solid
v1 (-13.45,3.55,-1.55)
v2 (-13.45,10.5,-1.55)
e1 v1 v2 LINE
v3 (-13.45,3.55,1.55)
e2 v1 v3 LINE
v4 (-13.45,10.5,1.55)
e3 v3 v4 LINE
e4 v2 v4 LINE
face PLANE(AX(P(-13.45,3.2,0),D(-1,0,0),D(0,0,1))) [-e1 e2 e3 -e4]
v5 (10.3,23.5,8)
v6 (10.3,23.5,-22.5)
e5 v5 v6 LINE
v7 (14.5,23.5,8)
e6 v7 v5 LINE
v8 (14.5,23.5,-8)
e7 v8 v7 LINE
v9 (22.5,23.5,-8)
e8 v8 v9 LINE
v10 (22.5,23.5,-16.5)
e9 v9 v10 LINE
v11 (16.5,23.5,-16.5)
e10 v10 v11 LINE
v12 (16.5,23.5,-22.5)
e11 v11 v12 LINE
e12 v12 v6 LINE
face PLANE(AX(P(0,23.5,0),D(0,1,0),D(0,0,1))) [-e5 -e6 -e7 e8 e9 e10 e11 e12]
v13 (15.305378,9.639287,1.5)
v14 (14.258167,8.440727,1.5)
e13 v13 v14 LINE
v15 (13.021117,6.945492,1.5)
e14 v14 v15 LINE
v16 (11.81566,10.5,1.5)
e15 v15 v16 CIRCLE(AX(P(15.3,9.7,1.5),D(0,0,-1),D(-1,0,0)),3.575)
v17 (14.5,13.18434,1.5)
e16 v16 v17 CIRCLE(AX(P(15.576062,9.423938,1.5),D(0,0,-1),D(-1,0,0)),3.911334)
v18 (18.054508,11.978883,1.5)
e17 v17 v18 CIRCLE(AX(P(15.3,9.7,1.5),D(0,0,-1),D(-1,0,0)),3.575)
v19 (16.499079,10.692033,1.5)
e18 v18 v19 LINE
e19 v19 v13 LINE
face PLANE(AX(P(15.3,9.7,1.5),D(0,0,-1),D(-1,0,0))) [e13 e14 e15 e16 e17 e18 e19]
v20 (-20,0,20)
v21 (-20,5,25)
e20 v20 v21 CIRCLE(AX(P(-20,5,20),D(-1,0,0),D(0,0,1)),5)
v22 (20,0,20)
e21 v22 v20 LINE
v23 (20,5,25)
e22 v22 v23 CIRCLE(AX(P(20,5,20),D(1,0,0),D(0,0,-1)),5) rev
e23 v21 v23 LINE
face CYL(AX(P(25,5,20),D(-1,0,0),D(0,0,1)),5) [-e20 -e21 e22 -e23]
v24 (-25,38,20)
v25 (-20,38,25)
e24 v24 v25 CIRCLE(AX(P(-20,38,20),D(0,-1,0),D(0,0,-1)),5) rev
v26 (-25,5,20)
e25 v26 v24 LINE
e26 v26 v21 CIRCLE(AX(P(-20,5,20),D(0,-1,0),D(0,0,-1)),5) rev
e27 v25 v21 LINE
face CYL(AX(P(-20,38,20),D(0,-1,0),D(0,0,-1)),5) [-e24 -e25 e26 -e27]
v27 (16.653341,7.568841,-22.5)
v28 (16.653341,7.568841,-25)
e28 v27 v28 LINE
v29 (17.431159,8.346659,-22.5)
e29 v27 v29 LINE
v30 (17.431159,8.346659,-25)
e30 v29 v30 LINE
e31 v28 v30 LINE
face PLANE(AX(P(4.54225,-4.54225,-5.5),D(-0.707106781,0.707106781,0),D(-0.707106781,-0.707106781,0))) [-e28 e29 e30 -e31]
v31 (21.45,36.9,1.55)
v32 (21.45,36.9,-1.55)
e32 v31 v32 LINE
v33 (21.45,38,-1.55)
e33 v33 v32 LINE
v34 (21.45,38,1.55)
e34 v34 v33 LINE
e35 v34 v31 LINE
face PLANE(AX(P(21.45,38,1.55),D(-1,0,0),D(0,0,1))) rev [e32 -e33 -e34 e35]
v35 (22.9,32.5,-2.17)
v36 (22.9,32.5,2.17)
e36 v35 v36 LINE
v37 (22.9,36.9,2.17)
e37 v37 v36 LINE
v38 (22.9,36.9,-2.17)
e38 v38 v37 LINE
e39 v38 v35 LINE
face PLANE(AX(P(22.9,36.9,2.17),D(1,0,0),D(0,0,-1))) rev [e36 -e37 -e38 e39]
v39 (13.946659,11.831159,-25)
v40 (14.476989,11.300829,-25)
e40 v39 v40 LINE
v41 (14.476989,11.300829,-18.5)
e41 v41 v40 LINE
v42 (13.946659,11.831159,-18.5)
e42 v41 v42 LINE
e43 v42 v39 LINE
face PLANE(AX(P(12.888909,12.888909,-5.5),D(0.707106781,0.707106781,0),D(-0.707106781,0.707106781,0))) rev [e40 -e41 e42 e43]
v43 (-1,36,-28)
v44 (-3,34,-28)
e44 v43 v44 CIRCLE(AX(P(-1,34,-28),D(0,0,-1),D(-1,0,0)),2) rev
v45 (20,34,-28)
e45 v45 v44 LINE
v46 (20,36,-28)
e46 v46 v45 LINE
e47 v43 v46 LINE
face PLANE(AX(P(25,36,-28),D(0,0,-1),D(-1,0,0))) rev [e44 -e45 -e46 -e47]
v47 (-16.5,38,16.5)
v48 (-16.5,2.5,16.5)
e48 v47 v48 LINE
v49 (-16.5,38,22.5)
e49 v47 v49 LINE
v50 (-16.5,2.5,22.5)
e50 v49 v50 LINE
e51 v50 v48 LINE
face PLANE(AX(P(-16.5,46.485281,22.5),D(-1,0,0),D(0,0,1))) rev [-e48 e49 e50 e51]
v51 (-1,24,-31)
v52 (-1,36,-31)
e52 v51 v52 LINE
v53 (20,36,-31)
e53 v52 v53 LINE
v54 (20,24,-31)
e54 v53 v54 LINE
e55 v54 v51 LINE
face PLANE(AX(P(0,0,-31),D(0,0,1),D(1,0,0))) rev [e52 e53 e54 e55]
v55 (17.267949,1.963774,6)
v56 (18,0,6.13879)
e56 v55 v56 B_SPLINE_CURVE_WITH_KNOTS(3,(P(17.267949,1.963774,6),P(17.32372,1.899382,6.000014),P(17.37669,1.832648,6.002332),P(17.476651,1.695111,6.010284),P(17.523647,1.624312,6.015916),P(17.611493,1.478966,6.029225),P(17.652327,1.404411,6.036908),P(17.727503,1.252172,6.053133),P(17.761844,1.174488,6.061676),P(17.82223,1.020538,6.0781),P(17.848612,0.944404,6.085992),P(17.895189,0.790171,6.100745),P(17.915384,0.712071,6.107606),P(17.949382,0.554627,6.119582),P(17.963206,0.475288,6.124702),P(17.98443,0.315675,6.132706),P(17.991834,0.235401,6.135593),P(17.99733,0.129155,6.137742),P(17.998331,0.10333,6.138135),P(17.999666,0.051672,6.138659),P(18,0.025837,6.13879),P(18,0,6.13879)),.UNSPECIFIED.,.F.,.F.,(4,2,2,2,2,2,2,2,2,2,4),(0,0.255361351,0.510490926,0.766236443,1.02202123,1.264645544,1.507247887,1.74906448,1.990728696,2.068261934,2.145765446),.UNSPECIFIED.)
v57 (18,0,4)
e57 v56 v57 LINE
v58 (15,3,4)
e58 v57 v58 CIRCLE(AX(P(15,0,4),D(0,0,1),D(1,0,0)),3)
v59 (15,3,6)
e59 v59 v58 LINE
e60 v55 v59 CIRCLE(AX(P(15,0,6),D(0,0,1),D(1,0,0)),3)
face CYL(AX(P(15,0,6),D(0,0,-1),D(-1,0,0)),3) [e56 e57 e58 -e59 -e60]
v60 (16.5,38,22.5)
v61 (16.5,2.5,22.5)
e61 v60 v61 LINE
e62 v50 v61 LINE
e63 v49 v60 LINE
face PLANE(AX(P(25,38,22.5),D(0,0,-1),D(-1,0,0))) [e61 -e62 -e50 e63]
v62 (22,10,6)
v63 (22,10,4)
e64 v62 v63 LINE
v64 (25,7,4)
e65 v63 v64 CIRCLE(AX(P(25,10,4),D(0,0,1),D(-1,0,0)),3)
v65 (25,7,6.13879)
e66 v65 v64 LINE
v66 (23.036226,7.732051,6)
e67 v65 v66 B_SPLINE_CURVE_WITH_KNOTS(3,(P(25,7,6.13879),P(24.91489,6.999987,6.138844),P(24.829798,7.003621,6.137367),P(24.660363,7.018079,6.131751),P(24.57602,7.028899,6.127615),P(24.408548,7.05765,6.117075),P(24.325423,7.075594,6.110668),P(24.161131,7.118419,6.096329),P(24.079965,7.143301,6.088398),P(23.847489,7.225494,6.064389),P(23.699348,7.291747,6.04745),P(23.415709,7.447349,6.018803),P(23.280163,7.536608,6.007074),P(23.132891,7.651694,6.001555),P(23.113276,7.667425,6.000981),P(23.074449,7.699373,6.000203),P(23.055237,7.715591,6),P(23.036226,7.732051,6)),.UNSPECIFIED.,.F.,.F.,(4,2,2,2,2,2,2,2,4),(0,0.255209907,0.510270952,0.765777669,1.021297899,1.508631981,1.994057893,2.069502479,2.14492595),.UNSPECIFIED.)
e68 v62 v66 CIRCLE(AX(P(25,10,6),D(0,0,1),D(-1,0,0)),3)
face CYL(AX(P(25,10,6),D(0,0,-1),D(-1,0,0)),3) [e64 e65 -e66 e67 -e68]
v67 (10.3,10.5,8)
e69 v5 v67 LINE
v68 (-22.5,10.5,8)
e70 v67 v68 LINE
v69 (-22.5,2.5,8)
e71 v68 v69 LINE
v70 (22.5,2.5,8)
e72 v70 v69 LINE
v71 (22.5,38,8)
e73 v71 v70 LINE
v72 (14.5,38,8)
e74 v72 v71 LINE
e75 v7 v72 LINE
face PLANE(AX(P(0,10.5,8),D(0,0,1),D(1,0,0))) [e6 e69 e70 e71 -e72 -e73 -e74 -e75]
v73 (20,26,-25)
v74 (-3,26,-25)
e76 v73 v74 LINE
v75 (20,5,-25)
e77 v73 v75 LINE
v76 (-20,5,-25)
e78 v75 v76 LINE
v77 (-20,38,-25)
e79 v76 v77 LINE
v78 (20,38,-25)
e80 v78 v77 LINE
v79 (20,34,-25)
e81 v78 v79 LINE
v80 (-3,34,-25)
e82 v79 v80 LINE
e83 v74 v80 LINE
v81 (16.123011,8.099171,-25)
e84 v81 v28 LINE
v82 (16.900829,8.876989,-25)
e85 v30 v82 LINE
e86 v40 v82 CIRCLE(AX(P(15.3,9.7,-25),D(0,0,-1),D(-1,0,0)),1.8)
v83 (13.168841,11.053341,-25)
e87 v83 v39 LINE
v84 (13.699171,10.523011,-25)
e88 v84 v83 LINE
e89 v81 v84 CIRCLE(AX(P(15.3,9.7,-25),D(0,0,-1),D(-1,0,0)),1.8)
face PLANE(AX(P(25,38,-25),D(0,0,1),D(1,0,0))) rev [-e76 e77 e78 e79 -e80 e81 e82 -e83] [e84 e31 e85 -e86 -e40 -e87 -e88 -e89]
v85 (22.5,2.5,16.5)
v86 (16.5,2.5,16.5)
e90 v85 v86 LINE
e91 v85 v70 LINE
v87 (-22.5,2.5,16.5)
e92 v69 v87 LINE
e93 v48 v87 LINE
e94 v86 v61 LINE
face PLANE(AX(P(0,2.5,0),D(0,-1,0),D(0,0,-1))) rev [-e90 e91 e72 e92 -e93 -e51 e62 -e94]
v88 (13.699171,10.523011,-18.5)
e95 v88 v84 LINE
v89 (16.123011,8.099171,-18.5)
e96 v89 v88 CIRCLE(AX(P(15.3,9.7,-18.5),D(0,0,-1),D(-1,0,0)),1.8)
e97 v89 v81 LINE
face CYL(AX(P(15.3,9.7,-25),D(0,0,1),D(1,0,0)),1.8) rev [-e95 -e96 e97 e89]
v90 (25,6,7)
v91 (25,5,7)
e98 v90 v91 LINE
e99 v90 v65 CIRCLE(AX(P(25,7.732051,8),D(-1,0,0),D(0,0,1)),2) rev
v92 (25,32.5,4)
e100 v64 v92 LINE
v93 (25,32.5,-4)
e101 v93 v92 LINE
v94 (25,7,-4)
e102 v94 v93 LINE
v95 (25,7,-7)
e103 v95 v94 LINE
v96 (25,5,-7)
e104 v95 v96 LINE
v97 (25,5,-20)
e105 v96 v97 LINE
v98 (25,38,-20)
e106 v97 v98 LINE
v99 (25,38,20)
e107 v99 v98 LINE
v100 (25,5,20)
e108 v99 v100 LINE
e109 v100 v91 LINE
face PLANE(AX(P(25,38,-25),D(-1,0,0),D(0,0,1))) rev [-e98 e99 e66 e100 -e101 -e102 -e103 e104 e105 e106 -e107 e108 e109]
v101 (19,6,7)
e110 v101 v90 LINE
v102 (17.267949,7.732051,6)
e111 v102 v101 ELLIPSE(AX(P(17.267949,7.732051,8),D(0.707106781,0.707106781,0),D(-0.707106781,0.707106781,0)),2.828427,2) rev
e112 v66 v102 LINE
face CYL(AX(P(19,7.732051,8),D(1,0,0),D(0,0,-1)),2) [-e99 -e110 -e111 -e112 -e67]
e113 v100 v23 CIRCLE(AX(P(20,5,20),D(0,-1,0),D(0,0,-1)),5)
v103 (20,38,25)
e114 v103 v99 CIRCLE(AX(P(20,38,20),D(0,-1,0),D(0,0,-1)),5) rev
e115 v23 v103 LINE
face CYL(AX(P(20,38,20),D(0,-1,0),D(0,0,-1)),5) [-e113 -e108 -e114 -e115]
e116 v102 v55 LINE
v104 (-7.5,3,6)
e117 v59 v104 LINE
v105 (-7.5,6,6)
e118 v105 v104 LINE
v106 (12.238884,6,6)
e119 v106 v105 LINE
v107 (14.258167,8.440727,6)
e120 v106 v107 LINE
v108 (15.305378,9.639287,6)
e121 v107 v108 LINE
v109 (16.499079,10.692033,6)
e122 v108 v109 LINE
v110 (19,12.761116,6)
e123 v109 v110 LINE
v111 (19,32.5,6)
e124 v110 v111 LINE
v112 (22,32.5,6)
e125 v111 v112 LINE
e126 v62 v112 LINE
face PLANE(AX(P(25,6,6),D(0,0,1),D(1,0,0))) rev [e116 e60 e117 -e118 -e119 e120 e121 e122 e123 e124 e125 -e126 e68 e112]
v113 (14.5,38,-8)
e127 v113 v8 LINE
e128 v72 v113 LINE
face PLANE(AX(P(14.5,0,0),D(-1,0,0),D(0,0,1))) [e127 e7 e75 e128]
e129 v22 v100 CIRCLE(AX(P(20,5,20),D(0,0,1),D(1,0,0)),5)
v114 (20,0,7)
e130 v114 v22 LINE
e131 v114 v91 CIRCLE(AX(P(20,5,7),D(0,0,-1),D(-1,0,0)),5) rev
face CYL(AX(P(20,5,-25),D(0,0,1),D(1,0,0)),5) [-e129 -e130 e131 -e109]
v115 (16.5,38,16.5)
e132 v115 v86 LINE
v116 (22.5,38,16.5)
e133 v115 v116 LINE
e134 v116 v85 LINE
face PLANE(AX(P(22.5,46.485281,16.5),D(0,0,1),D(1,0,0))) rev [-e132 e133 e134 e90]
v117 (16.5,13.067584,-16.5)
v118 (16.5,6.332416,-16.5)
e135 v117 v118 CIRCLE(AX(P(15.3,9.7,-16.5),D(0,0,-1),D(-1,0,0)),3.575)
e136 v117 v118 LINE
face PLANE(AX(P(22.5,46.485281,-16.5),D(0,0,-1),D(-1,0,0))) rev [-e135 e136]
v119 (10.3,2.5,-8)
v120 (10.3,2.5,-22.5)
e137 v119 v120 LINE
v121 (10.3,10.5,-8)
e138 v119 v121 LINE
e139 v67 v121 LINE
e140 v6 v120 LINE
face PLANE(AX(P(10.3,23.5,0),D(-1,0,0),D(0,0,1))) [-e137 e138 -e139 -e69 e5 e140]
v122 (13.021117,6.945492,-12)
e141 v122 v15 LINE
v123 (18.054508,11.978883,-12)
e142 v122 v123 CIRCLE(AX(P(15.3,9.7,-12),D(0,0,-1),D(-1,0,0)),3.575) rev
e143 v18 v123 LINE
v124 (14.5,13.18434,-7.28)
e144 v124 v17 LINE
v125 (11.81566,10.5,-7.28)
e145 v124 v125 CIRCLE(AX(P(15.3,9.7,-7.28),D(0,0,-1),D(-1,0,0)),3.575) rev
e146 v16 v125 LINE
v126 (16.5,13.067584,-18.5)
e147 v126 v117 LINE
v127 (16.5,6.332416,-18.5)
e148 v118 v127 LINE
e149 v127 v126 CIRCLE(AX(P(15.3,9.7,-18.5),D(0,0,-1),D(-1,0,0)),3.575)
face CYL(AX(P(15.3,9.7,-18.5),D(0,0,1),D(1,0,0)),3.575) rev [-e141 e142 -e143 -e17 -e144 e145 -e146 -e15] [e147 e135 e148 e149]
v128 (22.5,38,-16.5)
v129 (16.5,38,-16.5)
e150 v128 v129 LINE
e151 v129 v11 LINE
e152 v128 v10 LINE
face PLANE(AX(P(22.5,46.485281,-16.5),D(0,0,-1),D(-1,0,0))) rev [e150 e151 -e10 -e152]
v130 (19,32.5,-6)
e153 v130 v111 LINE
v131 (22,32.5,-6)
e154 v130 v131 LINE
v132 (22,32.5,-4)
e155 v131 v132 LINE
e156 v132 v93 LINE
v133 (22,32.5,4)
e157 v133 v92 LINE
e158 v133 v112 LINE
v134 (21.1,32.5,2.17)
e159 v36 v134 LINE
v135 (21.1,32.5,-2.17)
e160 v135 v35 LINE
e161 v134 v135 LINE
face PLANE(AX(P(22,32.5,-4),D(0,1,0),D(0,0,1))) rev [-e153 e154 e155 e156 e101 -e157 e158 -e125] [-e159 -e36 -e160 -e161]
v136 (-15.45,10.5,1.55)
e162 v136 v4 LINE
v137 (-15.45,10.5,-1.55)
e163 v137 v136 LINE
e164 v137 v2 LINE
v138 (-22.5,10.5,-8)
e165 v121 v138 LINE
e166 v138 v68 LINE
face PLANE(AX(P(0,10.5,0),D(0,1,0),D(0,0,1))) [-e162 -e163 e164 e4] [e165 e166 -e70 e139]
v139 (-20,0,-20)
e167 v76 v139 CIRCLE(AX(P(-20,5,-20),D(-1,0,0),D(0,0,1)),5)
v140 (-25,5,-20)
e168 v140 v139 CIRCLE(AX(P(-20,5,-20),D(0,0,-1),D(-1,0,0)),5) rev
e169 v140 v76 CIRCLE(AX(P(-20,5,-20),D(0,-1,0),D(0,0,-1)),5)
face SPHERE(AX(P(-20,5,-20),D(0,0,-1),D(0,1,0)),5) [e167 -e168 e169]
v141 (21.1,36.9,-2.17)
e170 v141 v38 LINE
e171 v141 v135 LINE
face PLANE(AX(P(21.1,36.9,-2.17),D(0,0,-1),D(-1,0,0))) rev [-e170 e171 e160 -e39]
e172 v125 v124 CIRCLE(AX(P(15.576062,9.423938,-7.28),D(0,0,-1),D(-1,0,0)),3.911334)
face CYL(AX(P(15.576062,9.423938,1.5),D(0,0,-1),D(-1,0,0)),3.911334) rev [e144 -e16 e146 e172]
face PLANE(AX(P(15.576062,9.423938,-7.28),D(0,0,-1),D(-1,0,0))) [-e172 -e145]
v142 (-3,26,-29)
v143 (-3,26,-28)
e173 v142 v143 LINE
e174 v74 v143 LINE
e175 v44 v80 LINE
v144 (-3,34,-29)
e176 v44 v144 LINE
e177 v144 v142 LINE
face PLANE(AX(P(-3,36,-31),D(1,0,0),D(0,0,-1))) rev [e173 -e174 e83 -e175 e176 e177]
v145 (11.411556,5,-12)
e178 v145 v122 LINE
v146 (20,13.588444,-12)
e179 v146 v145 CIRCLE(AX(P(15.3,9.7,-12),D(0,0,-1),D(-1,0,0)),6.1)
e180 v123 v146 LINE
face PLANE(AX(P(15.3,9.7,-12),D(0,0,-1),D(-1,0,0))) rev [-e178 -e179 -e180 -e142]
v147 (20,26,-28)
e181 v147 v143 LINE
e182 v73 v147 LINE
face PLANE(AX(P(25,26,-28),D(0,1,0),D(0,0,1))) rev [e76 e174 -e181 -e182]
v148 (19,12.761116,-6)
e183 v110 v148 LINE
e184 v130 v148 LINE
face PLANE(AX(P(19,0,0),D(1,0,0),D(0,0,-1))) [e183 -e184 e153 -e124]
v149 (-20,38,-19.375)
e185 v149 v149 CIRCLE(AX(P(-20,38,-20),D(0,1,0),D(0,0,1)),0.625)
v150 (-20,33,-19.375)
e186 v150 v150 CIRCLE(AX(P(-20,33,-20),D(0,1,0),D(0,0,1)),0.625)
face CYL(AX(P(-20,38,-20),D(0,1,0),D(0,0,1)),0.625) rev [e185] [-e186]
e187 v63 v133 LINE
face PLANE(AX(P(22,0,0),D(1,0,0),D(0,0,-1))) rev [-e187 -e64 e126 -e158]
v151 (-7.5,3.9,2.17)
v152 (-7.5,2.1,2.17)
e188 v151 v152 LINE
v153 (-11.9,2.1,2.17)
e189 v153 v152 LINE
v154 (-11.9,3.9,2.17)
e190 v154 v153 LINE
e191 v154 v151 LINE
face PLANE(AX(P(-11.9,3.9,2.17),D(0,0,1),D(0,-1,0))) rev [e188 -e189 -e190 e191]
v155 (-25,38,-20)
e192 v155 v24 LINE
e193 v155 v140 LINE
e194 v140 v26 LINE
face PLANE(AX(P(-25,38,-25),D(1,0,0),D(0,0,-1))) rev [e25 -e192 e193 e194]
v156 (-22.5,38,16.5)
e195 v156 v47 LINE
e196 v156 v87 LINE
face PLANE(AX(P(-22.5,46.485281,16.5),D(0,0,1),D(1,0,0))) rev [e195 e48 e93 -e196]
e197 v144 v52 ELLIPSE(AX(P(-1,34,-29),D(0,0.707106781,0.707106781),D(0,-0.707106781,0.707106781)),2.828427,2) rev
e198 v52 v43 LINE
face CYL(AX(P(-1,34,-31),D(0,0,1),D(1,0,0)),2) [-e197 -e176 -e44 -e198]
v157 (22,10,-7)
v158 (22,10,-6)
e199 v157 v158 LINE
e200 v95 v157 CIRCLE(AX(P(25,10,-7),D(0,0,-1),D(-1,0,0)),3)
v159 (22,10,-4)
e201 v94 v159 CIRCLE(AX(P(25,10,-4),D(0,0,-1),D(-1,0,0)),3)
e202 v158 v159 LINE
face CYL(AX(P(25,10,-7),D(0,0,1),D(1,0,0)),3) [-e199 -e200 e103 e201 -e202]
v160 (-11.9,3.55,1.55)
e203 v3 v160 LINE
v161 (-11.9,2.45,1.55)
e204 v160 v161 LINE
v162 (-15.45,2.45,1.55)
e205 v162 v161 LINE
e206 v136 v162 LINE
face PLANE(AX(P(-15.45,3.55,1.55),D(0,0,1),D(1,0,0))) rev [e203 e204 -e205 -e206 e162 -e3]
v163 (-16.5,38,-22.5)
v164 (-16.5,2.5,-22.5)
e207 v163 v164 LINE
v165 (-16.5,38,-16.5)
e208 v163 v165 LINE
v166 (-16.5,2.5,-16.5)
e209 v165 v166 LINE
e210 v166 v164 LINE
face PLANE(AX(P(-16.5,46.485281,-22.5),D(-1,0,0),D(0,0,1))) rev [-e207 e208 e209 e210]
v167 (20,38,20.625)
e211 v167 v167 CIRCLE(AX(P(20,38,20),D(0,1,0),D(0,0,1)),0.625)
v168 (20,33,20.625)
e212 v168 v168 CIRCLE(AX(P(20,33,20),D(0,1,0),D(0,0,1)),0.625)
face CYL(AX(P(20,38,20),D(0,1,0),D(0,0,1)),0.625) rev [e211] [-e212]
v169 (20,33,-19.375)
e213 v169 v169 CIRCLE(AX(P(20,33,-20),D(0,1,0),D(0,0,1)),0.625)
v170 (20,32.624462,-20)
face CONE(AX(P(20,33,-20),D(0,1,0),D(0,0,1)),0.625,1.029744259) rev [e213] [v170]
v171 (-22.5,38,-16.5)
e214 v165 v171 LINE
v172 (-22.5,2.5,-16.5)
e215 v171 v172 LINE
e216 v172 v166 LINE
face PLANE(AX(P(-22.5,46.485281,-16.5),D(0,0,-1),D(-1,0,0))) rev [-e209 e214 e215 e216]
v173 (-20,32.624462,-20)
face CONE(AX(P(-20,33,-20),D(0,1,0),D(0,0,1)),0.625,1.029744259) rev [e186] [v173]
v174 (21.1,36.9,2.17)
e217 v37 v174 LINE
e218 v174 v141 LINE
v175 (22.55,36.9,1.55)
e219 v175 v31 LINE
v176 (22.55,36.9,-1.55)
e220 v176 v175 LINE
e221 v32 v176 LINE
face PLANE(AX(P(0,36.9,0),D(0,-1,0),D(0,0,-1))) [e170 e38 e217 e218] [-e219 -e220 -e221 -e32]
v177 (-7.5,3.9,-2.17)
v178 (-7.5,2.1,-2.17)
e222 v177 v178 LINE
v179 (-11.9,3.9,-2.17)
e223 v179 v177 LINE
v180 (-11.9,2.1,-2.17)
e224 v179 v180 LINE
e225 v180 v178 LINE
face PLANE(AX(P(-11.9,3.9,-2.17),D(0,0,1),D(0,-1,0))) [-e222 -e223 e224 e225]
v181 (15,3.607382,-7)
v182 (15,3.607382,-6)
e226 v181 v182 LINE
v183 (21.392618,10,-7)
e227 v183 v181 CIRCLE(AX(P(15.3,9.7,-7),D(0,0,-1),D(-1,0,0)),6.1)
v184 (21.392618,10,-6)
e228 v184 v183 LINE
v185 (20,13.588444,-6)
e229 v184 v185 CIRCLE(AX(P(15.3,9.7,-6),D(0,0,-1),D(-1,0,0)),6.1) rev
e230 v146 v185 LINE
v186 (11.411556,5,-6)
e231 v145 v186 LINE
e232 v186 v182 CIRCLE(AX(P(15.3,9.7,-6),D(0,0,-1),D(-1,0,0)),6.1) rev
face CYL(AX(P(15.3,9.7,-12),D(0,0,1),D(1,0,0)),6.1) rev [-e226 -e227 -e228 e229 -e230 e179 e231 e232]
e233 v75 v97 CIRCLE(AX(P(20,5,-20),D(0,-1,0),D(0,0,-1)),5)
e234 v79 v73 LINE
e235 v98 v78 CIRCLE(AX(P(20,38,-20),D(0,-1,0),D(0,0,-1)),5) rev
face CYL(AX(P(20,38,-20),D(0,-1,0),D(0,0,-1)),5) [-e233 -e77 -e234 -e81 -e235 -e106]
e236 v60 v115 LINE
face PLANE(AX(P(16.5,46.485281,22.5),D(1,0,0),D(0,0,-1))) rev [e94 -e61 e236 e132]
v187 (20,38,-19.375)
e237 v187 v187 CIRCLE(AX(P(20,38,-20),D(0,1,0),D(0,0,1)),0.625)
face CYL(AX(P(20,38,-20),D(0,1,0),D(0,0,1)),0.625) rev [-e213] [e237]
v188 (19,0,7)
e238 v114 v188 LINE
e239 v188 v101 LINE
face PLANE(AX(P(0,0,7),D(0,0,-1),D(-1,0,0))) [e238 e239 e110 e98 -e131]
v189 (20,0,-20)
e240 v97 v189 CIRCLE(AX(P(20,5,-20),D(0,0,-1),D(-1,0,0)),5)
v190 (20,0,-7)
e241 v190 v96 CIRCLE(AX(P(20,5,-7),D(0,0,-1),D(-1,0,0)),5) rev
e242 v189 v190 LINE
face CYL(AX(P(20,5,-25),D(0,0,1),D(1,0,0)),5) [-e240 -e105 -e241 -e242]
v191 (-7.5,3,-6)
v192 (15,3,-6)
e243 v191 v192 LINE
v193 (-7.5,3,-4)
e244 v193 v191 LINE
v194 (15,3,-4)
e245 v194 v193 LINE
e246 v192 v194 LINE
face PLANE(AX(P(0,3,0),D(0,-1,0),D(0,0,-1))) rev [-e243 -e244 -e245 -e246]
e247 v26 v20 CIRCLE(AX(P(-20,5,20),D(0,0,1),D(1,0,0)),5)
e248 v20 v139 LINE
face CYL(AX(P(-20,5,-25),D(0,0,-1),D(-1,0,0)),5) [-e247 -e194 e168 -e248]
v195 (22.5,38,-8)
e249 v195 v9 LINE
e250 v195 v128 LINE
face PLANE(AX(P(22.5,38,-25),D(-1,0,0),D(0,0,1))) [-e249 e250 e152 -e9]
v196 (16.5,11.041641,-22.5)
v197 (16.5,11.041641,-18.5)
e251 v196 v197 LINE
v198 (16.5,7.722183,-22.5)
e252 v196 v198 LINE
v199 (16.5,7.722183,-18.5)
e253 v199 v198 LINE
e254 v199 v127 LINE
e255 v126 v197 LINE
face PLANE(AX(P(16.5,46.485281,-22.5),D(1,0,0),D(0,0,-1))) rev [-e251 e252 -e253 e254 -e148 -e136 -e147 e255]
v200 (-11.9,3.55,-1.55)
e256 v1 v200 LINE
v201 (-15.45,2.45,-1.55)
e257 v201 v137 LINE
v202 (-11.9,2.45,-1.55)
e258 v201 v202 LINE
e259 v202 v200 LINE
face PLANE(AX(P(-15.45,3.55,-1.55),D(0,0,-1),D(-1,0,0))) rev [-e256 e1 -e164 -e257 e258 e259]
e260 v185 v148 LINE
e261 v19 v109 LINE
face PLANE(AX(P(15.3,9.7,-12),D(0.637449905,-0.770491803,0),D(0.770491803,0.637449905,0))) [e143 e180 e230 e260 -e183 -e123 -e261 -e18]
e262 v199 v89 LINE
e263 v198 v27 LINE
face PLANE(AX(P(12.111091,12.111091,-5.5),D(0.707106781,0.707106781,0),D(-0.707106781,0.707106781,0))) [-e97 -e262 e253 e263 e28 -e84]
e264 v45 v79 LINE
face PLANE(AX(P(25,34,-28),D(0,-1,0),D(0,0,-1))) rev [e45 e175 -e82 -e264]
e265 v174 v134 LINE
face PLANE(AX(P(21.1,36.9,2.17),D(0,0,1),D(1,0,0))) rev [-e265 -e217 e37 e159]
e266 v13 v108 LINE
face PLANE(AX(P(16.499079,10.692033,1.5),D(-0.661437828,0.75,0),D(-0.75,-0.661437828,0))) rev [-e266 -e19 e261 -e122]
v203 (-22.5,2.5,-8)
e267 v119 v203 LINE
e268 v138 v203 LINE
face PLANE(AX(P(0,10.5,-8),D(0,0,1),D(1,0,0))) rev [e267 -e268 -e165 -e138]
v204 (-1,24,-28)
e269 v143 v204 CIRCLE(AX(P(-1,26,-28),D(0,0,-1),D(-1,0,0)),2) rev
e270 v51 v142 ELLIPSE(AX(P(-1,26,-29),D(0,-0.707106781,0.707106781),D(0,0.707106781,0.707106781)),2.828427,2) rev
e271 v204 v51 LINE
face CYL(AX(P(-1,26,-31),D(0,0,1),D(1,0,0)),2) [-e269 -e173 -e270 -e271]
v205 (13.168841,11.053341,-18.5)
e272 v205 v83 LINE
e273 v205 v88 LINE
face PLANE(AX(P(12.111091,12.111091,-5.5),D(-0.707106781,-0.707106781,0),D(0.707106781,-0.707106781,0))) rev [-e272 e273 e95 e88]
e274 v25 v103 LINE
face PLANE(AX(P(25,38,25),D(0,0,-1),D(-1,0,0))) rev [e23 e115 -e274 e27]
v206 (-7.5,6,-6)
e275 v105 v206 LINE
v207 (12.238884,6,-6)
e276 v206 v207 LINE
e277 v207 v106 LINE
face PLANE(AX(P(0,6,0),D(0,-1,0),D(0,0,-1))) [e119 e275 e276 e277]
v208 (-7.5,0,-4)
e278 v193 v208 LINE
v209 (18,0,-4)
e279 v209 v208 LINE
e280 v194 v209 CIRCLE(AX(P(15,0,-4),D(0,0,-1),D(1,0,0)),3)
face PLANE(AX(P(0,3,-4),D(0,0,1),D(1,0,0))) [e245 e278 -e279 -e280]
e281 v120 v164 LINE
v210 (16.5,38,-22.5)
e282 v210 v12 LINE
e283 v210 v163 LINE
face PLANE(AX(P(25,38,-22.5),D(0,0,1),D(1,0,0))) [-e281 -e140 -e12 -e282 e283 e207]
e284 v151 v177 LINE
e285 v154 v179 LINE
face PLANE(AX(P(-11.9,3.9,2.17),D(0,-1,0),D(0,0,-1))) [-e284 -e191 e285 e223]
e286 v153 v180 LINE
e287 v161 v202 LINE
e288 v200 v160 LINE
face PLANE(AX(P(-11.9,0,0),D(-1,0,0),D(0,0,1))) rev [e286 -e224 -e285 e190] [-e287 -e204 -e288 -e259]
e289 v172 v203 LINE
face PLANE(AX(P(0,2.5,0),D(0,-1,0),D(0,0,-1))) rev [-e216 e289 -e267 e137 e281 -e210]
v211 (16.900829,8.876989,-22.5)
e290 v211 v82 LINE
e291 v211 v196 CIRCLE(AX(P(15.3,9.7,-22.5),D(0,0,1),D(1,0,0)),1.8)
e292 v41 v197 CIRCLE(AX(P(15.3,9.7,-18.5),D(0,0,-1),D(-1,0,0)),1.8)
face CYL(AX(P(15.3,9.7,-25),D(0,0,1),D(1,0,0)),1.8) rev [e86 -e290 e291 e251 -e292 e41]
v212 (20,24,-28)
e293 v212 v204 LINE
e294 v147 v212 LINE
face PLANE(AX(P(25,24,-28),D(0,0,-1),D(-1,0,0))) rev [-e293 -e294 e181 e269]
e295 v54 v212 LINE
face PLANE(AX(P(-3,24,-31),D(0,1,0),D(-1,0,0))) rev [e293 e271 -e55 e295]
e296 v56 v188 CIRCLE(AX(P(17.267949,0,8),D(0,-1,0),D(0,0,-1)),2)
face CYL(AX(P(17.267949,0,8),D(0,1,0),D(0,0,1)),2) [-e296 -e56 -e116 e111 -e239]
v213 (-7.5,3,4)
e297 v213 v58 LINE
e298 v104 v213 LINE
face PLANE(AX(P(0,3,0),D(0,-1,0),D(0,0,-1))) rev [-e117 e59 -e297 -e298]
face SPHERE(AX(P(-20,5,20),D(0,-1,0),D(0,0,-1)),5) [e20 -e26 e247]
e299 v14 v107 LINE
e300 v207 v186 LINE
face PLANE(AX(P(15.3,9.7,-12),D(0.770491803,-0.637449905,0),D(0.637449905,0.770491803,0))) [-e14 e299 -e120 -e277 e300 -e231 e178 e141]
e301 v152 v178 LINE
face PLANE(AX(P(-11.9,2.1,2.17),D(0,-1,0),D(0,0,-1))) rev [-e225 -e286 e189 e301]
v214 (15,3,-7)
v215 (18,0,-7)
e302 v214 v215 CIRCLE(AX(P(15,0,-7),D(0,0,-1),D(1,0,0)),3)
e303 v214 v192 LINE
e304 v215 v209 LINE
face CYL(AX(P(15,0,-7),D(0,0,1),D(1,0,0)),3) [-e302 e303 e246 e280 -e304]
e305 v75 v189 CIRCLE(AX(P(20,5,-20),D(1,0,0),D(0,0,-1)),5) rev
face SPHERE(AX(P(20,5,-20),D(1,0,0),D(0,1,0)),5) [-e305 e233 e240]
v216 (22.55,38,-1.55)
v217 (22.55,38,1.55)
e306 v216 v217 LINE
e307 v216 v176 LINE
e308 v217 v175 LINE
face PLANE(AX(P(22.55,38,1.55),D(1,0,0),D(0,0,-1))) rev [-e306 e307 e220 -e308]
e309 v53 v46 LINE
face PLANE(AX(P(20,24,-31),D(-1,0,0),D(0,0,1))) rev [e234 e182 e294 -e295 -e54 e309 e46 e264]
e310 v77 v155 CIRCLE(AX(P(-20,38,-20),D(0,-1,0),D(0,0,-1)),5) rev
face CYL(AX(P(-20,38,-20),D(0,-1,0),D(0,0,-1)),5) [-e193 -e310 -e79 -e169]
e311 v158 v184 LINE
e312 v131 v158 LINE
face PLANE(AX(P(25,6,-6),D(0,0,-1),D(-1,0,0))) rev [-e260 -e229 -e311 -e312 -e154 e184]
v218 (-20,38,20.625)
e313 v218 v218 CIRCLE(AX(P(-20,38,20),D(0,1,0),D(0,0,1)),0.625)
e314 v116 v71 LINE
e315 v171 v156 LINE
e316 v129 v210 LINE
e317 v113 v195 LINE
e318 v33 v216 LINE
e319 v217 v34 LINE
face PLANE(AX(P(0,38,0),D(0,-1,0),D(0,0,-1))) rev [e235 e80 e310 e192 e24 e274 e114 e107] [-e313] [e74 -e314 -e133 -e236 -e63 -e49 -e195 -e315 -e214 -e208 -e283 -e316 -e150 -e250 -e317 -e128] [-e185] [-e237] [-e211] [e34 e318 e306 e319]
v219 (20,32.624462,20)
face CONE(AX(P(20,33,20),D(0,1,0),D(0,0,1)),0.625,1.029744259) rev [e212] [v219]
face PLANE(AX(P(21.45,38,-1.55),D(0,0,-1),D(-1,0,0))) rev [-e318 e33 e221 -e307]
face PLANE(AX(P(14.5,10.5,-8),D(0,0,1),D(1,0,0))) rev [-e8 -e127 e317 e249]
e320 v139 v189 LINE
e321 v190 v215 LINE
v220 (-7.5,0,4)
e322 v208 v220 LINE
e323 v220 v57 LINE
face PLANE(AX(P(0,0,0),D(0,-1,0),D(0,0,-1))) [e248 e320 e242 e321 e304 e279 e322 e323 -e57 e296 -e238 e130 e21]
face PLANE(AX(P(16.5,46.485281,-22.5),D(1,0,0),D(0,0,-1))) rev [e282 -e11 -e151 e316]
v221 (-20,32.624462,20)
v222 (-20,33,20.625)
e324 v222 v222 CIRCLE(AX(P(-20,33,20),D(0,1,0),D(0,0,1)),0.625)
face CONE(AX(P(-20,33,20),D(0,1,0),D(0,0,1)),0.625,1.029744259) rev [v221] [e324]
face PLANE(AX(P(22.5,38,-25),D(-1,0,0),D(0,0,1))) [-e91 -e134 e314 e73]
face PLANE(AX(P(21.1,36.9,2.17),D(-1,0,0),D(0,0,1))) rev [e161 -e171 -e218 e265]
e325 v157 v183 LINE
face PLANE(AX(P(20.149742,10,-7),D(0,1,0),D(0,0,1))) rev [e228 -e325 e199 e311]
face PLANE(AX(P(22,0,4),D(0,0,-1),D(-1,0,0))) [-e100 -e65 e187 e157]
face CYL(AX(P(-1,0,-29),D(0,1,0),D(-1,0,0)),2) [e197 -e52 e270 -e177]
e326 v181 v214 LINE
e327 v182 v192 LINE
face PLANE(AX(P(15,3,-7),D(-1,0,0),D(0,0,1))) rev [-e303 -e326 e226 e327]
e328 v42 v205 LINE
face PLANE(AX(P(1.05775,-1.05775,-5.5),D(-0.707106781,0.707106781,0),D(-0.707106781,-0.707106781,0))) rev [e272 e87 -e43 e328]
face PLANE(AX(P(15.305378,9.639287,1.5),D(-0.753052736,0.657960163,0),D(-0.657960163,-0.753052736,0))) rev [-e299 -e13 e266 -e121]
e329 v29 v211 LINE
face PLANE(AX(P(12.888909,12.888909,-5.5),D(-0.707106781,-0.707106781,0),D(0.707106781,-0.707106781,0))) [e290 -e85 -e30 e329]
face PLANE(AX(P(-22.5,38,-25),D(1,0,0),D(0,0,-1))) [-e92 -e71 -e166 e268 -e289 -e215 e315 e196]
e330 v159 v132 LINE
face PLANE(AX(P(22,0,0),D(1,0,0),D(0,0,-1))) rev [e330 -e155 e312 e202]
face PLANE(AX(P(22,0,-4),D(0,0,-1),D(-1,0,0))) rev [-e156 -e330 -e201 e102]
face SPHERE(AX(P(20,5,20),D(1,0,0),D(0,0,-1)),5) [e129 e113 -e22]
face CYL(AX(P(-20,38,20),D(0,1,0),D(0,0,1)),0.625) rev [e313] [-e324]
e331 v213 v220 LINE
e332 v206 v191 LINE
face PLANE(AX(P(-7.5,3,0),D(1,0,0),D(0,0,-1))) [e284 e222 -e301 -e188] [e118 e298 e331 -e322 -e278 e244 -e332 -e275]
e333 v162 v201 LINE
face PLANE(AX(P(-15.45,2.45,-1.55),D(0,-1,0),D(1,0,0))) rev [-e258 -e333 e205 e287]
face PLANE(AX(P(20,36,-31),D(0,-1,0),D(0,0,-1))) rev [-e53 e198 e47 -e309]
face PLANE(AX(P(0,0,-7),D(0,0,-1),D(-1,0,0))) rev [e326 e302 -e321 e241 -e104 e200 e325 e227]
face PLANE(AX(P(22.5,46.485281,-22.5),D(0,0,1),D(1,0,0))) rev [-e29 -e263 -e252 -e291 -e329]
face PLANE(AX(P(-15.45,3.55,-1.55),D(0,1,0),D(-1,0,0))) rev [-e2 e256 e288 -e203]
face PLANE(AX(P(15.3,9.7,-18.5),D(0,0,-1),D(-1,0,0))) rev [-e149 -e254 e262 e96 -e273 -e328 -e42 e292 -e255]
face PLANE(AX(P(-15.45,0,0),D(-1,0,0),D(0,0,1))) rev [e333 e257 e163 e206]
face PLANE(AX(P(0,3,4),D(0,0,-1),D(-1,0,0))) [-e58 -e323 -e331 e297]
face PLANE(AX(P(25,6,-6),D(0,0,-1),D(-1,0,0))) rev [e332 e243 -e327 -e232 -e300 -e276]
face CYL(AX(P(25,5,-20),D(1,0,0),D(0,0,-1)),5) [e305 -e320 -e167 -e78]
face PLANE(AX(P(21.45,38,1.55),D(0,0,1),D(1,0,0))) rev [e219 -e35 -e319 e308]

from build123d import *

# Parameters (mm, degrees)
SKETCH1_W                = 50
SKETCH1_H                = 50
BOSS_EXTRUDE1_DEPTH      = 38
SHELL1_T                 = -2.5
BOSS_EXTRUDE2_DEPTH      = 21
SKETCH3_W                = 45
SKETCH3_H                = 16
BOSS_EXTRUDE3_DEPTH      = 8
SKETCH4_W                = 32.5
SKETCH4_H                = 8
CUT_EXTRUDE1_DEPTH       = 3
SKETCH7_W                = 32.5
SKETCH7_H                = 12
CUT_EXTRUDE2_DEPTH       = 3
SKETCH8_W                = 16
SKETCH8_H                = 27.5
BOSS_EXTRUDE4_DEPTH      = 8
SKETCH9_W                = 8
SKETCH9_H                = 32.5
CUT_EXTRUDE3_DEPTH       = 3
CUT_EXTRUDE5_DEPTH       = 3
CUT_EXTRUDE7_DEPTH       = 10
CUT_EXTRUDE7_DEPTH_BACK  = 2
SKETCH13_W               = 3
SKETCH13_H               = 3.011524732
FILLET1_R                = 5
SKETCH16_R               = 1.8
CUT_EXTRUDE8_DEPTH       = 53.642663306
SKETCH17_W               = 23
SKETCH17_H               = 12
BOSS_EXTRUDE5_DEPTH      = 6
SKETCH18_W               = 3
SKETCH18_H               = 2
CUT_EXTRUDE9_DEPTH       = 57.471231614
CUT_EXTRUDE12_DEPTH      = 2
CUT_EXTRUDE13_DEPTH      = 2
CUT_EXTRUDE14_DEPTH      = 16
CUT_EXTRUDE10_START      = -19.5
CUT_EXTRUDE10_DEPTH      = 19.5
FILLET4_R                = 2
CUT_EXTRUDE18_DEPTH      = 13
CUT_EXTRUDE18_DEPTH_BACK = 1
SKETCH26_W               = 6
SKETCH26_H               = 6
BOSS_EXTRUDE6_DEPTH      = 4.5
SKETCH30_W               = 4.34
SKETCH30_H               = 1.8
CUT_EXTRUDE19_DEPTH      = 4.4
SKETCH31_W               = 1.8
SKETCH31_H               = 4.34
CUT_EXTRUDE20_DEPTH      = 4.4
SKETCH32_W               = 1.1
SKETCH32_H               = 3.1
CUT_EXTRUDE21_DEPTH      = 55.291896265
SKETCH33_W               = 3.1
SKETCH33_H               = 1.1
CUT_EXTRUDE22_DEPTH      = 3.55
SKETCH34_W               = 2
SKETCH34_H               = 3.1
CUT_EXTRUDE23_DEPTH      = 7.3
SKETCH45_R               = 3.575
CUT_EXTRUDE27_DEPTH      = 20
SKETCH46_W               = 1.850257739
SKETCH46_H               = 4
SKETCH46_W_2             = 4
SKETCH46_H_2             = 1.850257739
CUT_EXTRUDE28_DEPTH      = 1
CUT_EXTRUDE25_START      = -3
CUT_EXTRUDE25_DEPTH      = 3
CUT_EXTRUDE24_START      = -3
CUT_EXTRUDE24_DEPTH      = 3
CUT_EXTRUDE29_DEPTH      = 2
FILLET8_R                = 2
BOSS_EXTRUDE9_DEPTH      = 8.78
SKETCH49_W               = 4.2
SKETCH49_H               = 13
BOSS_EXTRUDE10_DEPTH     = 6.5
SKETCH50_W               = 6
SKETCH50_H               = 6
BOSS_EXTRUDE11_DEPTH     = 35.5
M1_6_TAPPED_HOLE1_D      = 1.25
M1_6_TAPPED_HOLE1_DEPTH  = 5
M1_6_TAPPED_HOLE1_TIP    = 0.375537887


with BuildPart() as part:
    # Sketch1 → Boss-Extrude1 (new body)
    with BuildSketch(Plane(origin=(0, 0, 0), x_dir=(1, 0, 0), z_dir=(0, 1, 0))):
        Rectangle(SKETCH1_W, SKETCH1_H)
    extrude(amount=BOSS_EXTRUDE1_DEPTH)

    # Shell1
    shell1_openings = [part.faces().sort_by_distance(p)[0] for p in [
        (0, 38, 0),
    ]]
    offset(amount=SHELL1_T, openings=shell1_openings, kind=Kind.INTERSECTION)

    # Sketch2 → Boss-Extrude2 (add)
    with BuildSketch(Plane(origin=(0, 2.5, 0), x_dir=(1, 0, 0), z_dir=(0, 1, 0))):
        Polygon((10.3, 22.5), (10.3, 13.5), (10.3, 7.28), (22.5, 7.28), (22.5, 22.5), align=None)
    extrude(amount=BOSS_EXTRUDE2_DEPTH)

    # Sketch3 → Boss-Extrude3 (add)
    with BuildSketch(Plane(origin=(0, 2.5, 0), x_dir=(1, 0, 0), z_dir=(0, 1, 0))):
        Rectangle(SKETCH3_W, SKETCH3_H)
    extrude(amount=BOSS_EXTRUDE3_DEPTH)

    # Sketch4 → Cut-Extrude1 (cut)
    with BuildSketch(Plane.XZ):
        with Locations((8.75, 0)):
            Rectangle(SKETCH4_W, SKETCH4_H)
    extrude(amount=-CUT_EXTRUDE1_DEPTH, mode=Mode.SUBTRACT)

    # Sketch7 → Cut-Extrude2 (cut)
    with BuildSketch(Plane(origin=(0, 3, 0), x_dir=(-1, 0, 0), z_dir=(0, -1, 0))):
        with Locations((-8.75, 0)):
            Rectangle(SKETCH7_W, SKETCH7_H)
    extrude(amount=-CUT_EXTRUDE2_DEPTH, mode=Mode.SUBTRACT)

    # Sketch8 → Boss-Extrude4 (add)
    with BuildSketch(Plane.ZY.offset(-22.5)):
        with Locations((0, 24.25)):
            Rectangle(SKETCH8_W, SKETCH8_H)
    extrude(amount=BOSS_EXTRUDE4_DEPTH)

    # Sketch9 → Cut-Extrude3 (cut)
    with BuildSketch(Plane(origin=(25, 0, 0), x_dir=(0, 0, -1), z_dir=(1, 0, 0))):
        with Locations((0, 16.25)):
            Rectangle(SKETCH9_W, SKETCH9_H)
    extrude(amount=-CUT_EXTRUDE3_DEPTH, mode=Mode.SUBTRACT)

    # Sketch10 → Cut-Extrude5 (cut)
    with BuildSketch(Plane(origin=(22, 0, 0), x_dir=(0, 0, -1), z_dir=(1, 0, 0))):
        Polygon((-6, 32.5), (-6, 0), (6, 0), (6, 3), (6, 32.5), align=None)
    extrude(amount=-CUT_EXTRUDE5_DEPTH, mode=Mode.SUBTRACT)

    # Sketch13 → Cut-Extrude7 (cut, two sides: drawn at the far end of the back side and taken through both)
    with BuildSketch(Plane(origin=(0, 0, 4), x_dir=(-1, 0, 0), z_dir=(0, 0, -1)).offset(-CUT_EXTRUDE7_DEPTH_BACK)):
        with Locations((-23.5, 1.505762366)):
            Rectangle(SKETCH13_W, SKETCH13_H)
    extrude(amount=CUT_EXTRUDE7_DEPTH + CUT_EXTRUDE7_DEPTH_BACK, mode=Mode.SUBTRACT)

    # Fillet1
    fillet1_edges = [part.edges().sort_by_distance(p)[0] for p in [
        (25, 0, -15.5),
        (0, 0, -25),
        (25, 0, 15.5),
        (0, 0, 25),
        (-25, 0, 0),
        (-25, 19, -25),
        (25, 19, -25),
        (25, 19, 25),
        (-25, 19, 25),
    ]]
    fillet(fillet1_edges, radius=FILLET1_R)

    # Sketch16 → Cut-Extrude8 (cut, through all)
    with BuildSketch(Plane(origin=(0, 0, 1.5), x_dir=(-1, 0, 0), z_dir=(0, 0, -1))):
        with Locations(Location((-15.3, 9.7, 0), (0, 0, 63.612200039))):
            Circle(SKETCH16_R)
    extrude(amount=CUT_EXTRUDE8_DEPTH, mode=Mode.SUBTRACT)

    # Sketch17 → Boss-Extrude5 (add)
    with BuildSketch(Plane(origin=(0, 0, -25), x_dir=(-1, 0, 0), z_dir=(0, 0, -1))):
        with Locations((-8.5, 30)):
            Rectangle(SKETCH17_W, SKETCH17_H)
    extrude(amount=BOSS_EXTRUDE5_DEPTH)

    # Sketch18 → Cut-Extrude9 (cut, through all)
    with BuildSketch(Plane.ZY.offset(3)):
        with Locations((-26.5, 25)):
            Rectangle(SKETCH18_W, SKETCH18_H)
        with Locations((-26.5, 35)):
            Rectangle(SKETCH18_W, SKETCH18_H)
    extrude(amount=-CUT_EXTRUDE9_DEPTH, mode=Mode.SUBTRACT)

    # Sketch20 → Cut-Extrude12 (cut)
    with BuildSketch(Plane(origin=(0, 0, 4), x_dir=(-1, 0, 0), z_dir=(0, 0, -1))):
        with BuildLine():
            Line((-22, 10), (-22, 7))
            Line((-22, 7), (-22, 6))
            Line((-22, 6), (-24, 6))
            Line((-24, 6), (-25, 6))
            Line((-25, 6), (-25, 7))
            ThreePointArc((-25, 7), (-22.878679656, 7.878679656), (-22, 10))
        make_face()
    extrude(amount=-CUT_EXTRUDE12_DEPTH, mode=Mode.SUBTRACT)

    # Sketch21 → Cut-Extrude13 (cut)
    with BuildSketch(Plane(origin=(0, 0, 4), x_dir=(-1, 0, 0), z_dir=(0, 0, -1))):
        with BuildLine():
            Line((-19, 3), (-19, 0))
            Line((-19, 0), (-18, 0))
            ThreePointArc((-18, 0), (-17.121320344, 2.121320344), (-15, 3))
            Line((-15, 3), (-19, 3))
        make_face()
    extrude(amount=-CUT_EXTRUDE13_DEPTH, mode=Mode.SUBTRACT)

    # Sketch22 → Cut-Extrude14 (cut)
    with BuildSketch(Plane(origin=(0, 0, 4), x_dir=(-1, 0, 0), z_dir=(0, 0, -1))):
        with BuildLine():
            Line((-15.3, 9.7), (-11.411555581, 5))
            ThreePointArc((-11.411555581, 5), (-19.613351365, 5.386648635), (-20, 13.588444419))
            Line((-20, 13.588444419), (-15.3, 9.7))
        make_face()
    extrude(amount=CUT_EXTRUDE14_DEPTH, mode=Mode.SUBTRACT)

    # Sketch19 → Cut-Extrude10 (cut)
    with BuildSketch(Plane(origin=(0, 0, -25), x_dir=(-1, 0, 0), z_dir=(0, 0, -1)).offset(CUT_EXTRUDE10_START)):
        with BuildLine():
            ThreePointArc((-16.123011235, 8.099171306), (-16.572792206, 8.427207794), (-16.900828694, 8.876988765))
            Line((-16.900828694, 8.876988765), (-17.43115878, 8.346658679))
            Line((-17.43115878, 8.346658679), (-16.653341321, 7.56884122))
            Line((-16.653341321, 7.56884122), (-16.123011235, 8.099171306))
        make_face()
        with BuildLine():
            ThreePointArc((-14.476988765, 11.300828694), (-14.027207794, 10.972792206), (-13.699171306, 10.523011235))
            Line((-13.699171306, 10.523011235), (-13.16884122, 11.053341321))
            Line((-13.16884122, 11.053341321), (-13.946658679, 11.83115878))
            Line((-13.946658679, 11.83115878), (-14.476988765, 11.300828694))
        make_face()
    extrude(amount=CUT_EXTRUDE10_DEPTH, mode=Mode.SUBTRACT)

    # Fillet4
    fillet4_edges = [part.edges().sort_by_distance(p)[0] for p in [
        (-3, 36, -29.5),
        (-3, 24, -29.5),
        (-3, 30, -31),
    ]]
    fillet(fillet4_edges, radius=FILLET4_R)

    # Sketch26 → Cut-Extrude18 (cut, two sides: drawn at the far end of the back side and taken through both)
    with BuildSketch(Plane(origin=(0, 0, 6), x_dir=(-1, 0, 0), z_dir=(0, 0, -1)).offset(-CUT_EXTRUDE18_DEPTH_BACK)):
        with Locations((-22, 3)):
            Rectangle(SKETCH26_W, SKETCH26_H)
    extrude(amount=CUT_EXTRUDE18_DEPTH + CUT_EXTRUDE18_DEPTH_BACK, mode=Mode.SUBTRACT)

    # Sketch29 → Boss-Extrude6 (add)
    with BuildSketch(Plane(origin=(0, 0, 6), x_dir=(-1, 0, 0), z_dir=(0, 0, -1))):
        with BuildLine():
            Line((-16.499079266, 10.69203257), (-15.305377807, 9.639286837))
            Line((-15.305377807, 9.639286837), (-14.258167132, 8.440726637))
            ThreePointArc((-14.258167132, 8.440726637), (-14.177344347, 10.762112408), (-16.499079266, 10.69203257))
        make_face()
    extrude(amount=BOSS_EXTRUDE6_DEPTH)

    # Sketch30 → Cut-Extrude19 (cut)
    with BuildSketch(Plane(origin=(-7.5, 0, 0), x_dir=(0, 0, -1), z_dir=(1, 0, 0))):
        with Locations((0, 3)):
            Rectangle(SKETCH30_W, SKETCH30_H)
    extrude(amount=-CUT_EXTRUDE19_DEPTH, mode=Mode.SUBTRACT)

    # Sketch31 → Cut-Extrude20 (cut)
    with BuildSketch(Plane.XZ.offset(-32.5)):
        with Locations((22, 0)):
            Rectangle(SKETCH31_W, SKETCH31_H)
    extrude(amount=-CUT_EXTRUDE20_DEPTH, mode=Mode.SUBTRACT)

    # Sketch32 → Cut-Extrude21 (cut, through all)
    with BuildSketch(Plane.XZ.offset(-36.9)):
        with Locations((22, 0)):
            Rectangle(SKETCH32_W, SKETCH32_H)
    extrude(amount=-CUT_EXTRUDE21_DEPTH, mode=Mode.SUBTRACT)

    # Sketch33 → Cut-Extrude22 (cut)
    with BuildSketch(Plane(origin=(-11.9, 0, 0), x_dir=(0, 0, -1), z_dir=(1, 0, 0))):
        with Locations((0, 3)):
            Rectangle(SKETCH33_W, SKETCH33_H)
    extrude(amount=-CUT_EXTRUDE22_DEPTH, mode=Mode.SUBTRACT)

    # Sketch34 → Cut-Extrude23 (cut)
    with BuildSketch(Plane(origin=(0, 10.5, 0), x_dir=(1, 0, 0), z_dir=(0, 1, 0))):
        with Locations((-14.45, 0)):
            Rectangle(SKETCH34_W, SKETCH34_H)
    extrude(amount=-CUT_EXTRUDE23_DEPTH, mode=Mode.SUBTRACT)

    # Sketch45 → Cut-Extrude27 (cut)
    with BuildSketch(Plane(origin=(0, 0, 1.5), x_dir=(-1, 0, 0), z_dir=(0, 0, -1))):
        with Locations(Location((-15.3, 9.7, 0), (0, 0, 140.398072919))):
            Circle(SKETCH45_R)
    extrude(amount=CUT_EXTRUDE27_DEPTH, mode=Mode.SUBTRACT)

    # Sketch46 → Cut-Extrude28 (cut)
    with BuildSketch(Plane.XY.offset(-6)):
        with Locations((21.074871131, 8)):
            Rectangle(SKETCH46_W, SKETCH46_H)
        with Locations((17, 3.925128869)):
            Rectangle(SKETCH46_W_2, SKETCH46_H_2)
    extrude(amount=-CUT_EXTRUDE28_DEPTH, mode=Mode.SUBTRACT)

    # Sketch43 → Cut-Extrude25 (cut)
    with BuildSketch(Plane.XY.offset(-4).offset(CUT_EXTRUDE25_START)):
        with BuildLine():
            Line((19, 0), (18, 0))
            ThreePointArc((18, 0), (17.121320344, 2.121320344), (15, 3))
            Line((15, 3), (19, 3))
            Line((19, 3), (19, 0))
        make_face()
    extrude(amount=CUT_EXTRUDE25_DEPTH, mode=Mode.SUBTRACT)

    # Sketch42 → Cut-Extrude24 (cut)
    with BuildSketch(Plane.XY.offset(-4).offset(CUT_EXTRUDE24_START)):
        with BuildLine():
            Line((22, 6), (25, 6))
            Line((25, 6), (25, 7))
            ThreePointArc((25, 7), (22.878679656, 7.878679656), (22, 10))
            Line((22, 10), (22, 6))
        make_face()
    extrude(amount=CUT_EXTRUDE24_DEPTH, mode=Mode.SUBTRACT)

    # Sketch47 → Cut-Extrude29 (cut)
    with BuildSketch(Plane(origin=(0, 0, 4), x_dir=(-1, 0, 0), z_dir=(0, 0, -1))):
        Polygon((-19, 12.761115819), (-16.499079266, 10.69203257), (-15.305377807, 9.639286837), (-14.258167132, 8.440726637), (-12.238884181, 6), (-19, 6), align=None)
    extrude(amount=-CUT_EXTRUDE29_DEPTH, mode=Mode.SUBTRACT)

    # Fillet8
    # the kernel refuses this fillet: 2 mm, written as the material it takes off along each edge
    with BuildSketch(Plane(origin=(19, 6, 6), x_dir=(-1, 0, 0), z_dir=(0, -1, 0))) as fillet8_piece_1_section:
        with BuildLine():
            CenterArc((1.732050808, -2), FILLET8_R, 90, 60)
            Line((0, -1), (0, 0))
            Line((0, 0), (1.732050808, 0))
        make_face()
    fillet8_piece_1 = extrude(amount=10.330127019, mode=Mode.PRIVATE)
    fillet8_piece_1 = fillet8_piece_1 - Plane(origin=(15, 0, 6), x_dir=(1, 0, 0), z_dir=(0, 0, -1)) * Cylinder(3, 28, mode=Mode.PRIVATE)
    add(fillet8_piece_1, mode=Mode.SUBTRACT)
    with BuildSketch(Plane(origin=(29.330127019, 6, 6), x_dir=(0, 1, 0), z_dir=(-1, 0, 0))) as fillet8_piece_2_section:
        with BuildLine():
            CenterArc((1.732050808, -2), FILLET8_R, 90, 60)
            Line((0, -1), (0, 0))
            Line((0, 0), (1.732050808, 0))
        make_face()
    fillet8_piece_2 = extrude(amount=10.330127019, mode=Mode.PRIVATE)
    fillet8_piece_2 = fillet8_piece_2 - Plane(origin=(25, 10, 6), x_dir=(0, -1, 0), z_dir=(0, 0, -1)) * Cylinder(3, 28, mode=Mode.PRIVATE)
    add(fillet8_piece_2, mode=Mode.SUBTRACT)
    with BuildSketch(Plane(origin=(25, 6, 6), x_dir=(0, 1, 0), z_dir=(-1, 0, 0))) as fillet8_piece_3a_section:
        with BuildLine():
            CenterArc((1.732050808, -2), FILLET8_R, 90, 60)
            Line((0, -1), (0, 0))
            Line((0, 0), (1.732050808, 0))
        make_face()
    fillet8_piece_3a = extrude(amount=10.330127019, mode=Mode.PRIVATE)
    fillet8_piece_3a = split(fillet8_piece_3a, bisect_by=Plane(origin=(19, 6, 6), z_dir=(-1, 0, 0)), keep=Keep.TOP, mode=Mode.PRIVATE)
    with BuildSketch(Plane(origin=(19, 10.330127019, 6), x_dir=(-1, 0, 0), z_dir=(0, -1, 0))) as fillet8_piece_3b_section:
        with BuildLine():
            CenterArc((1.732050808, -2), FILLET8_R, 90, 60)
            Line((0, -1), (0, 0))
            Line((0, 0), (1.732050808, 0))
        make_face()
    fillet8_piece_3b = extrude(amount=10.330127019, mode=Mode.PRIVATE)
    fillet8_piece_3b = split(fillet8_piece_3b, bisect_by=Plane(origin=(19, 6, 6), z_dir=(0, 1, 0)), keep=Keep.TOP, mode=Mode.PRIVATE)
    fillet8_piece_3 = fillet8_piece_3a & fillet8_piece_3b
    add(fillet8_piece_3, mode=Mode.SUBTRACT)

    # Sketch48 → Boss-Extrude9 (add)
    with BuildSketch(Plane.XY.offset(-7.28)):
        with BuildLine():
            Line((10.3, 10.5), (10.3, 23.5))
            Line((10.3, 23.5), (14.5, 23.5))
            Line((14.5, 23.5), (14.5, 13.184339966))
            ThreePointArc((14.5, 13.184339966), (12.8103313, 12.1896687), (11.815660034, 10.5))
            Line((11.815660034, 10.5), (10.3, 10.5))
        make_face()
    extrude(amount=BOSS_EXTRUDE9_DEPTH)

    # Sketch49 → Boss-Extrude10 (add)
    with BuildSketch(Plane.XY.offset(1.5)):
        with Locations((12.4, 17)):
            Rectangle(SKETCH49_W, SKETCH49_H)
    extrude(amount=BOSS_EXTRUDE10_DEPTH)

    # Sketch50 → Boss-Extrude11 (add)
    with BuildSketch(Plane(origin=(0, 2.5, 0), x_dir=(1, 0, 0), z_dir=(0, 1, 0))):
        with Locations((-19.5, 19.5)):
            Rectangle(SKETCH50_W, SKETCH50_H)
        with Locations((-19.5, -19.5)):
            Rectangle(SKETCH50_W, SKETCH50_H)
        with Locations((19.5, 19.5)):
            Rectangle(SKETCH50_W, SKETCH50_H)
        with Locations((19.5, -19.5)):
            Rectangle(SKETCH50_W, SKETCH50_H)
    extrude(amount=BOSS_EXTRUDE11_DEPTH)

    # M1.6 Tapped Hole1
    with Locations(Plane(origin=(0, 38, 0), x_dir=(1, 0, 0), z_dir=(0, 1, 0))):
        with Locations((-20, -20), (-20, 20), (20, 20), (20, -20)):
            Hole(M1_6_TAPPED_HOLE1_D / 2, depth=M1_6_TAPPED_HOLE1_DEPTH)
            with Locations((0, 0, -(M1_6_TAPPED_HOLE1_DEPTH + M1_6_TAPPED_HOLE1_TIP / 2))):  # 118° drill point
                Cone(0, M1_6_TAPPED_HOLE1_D / 2, M1_6_TAPPED_HOLE1_TIP, mode=Mode.SUBTRACT)


solid = part.part
